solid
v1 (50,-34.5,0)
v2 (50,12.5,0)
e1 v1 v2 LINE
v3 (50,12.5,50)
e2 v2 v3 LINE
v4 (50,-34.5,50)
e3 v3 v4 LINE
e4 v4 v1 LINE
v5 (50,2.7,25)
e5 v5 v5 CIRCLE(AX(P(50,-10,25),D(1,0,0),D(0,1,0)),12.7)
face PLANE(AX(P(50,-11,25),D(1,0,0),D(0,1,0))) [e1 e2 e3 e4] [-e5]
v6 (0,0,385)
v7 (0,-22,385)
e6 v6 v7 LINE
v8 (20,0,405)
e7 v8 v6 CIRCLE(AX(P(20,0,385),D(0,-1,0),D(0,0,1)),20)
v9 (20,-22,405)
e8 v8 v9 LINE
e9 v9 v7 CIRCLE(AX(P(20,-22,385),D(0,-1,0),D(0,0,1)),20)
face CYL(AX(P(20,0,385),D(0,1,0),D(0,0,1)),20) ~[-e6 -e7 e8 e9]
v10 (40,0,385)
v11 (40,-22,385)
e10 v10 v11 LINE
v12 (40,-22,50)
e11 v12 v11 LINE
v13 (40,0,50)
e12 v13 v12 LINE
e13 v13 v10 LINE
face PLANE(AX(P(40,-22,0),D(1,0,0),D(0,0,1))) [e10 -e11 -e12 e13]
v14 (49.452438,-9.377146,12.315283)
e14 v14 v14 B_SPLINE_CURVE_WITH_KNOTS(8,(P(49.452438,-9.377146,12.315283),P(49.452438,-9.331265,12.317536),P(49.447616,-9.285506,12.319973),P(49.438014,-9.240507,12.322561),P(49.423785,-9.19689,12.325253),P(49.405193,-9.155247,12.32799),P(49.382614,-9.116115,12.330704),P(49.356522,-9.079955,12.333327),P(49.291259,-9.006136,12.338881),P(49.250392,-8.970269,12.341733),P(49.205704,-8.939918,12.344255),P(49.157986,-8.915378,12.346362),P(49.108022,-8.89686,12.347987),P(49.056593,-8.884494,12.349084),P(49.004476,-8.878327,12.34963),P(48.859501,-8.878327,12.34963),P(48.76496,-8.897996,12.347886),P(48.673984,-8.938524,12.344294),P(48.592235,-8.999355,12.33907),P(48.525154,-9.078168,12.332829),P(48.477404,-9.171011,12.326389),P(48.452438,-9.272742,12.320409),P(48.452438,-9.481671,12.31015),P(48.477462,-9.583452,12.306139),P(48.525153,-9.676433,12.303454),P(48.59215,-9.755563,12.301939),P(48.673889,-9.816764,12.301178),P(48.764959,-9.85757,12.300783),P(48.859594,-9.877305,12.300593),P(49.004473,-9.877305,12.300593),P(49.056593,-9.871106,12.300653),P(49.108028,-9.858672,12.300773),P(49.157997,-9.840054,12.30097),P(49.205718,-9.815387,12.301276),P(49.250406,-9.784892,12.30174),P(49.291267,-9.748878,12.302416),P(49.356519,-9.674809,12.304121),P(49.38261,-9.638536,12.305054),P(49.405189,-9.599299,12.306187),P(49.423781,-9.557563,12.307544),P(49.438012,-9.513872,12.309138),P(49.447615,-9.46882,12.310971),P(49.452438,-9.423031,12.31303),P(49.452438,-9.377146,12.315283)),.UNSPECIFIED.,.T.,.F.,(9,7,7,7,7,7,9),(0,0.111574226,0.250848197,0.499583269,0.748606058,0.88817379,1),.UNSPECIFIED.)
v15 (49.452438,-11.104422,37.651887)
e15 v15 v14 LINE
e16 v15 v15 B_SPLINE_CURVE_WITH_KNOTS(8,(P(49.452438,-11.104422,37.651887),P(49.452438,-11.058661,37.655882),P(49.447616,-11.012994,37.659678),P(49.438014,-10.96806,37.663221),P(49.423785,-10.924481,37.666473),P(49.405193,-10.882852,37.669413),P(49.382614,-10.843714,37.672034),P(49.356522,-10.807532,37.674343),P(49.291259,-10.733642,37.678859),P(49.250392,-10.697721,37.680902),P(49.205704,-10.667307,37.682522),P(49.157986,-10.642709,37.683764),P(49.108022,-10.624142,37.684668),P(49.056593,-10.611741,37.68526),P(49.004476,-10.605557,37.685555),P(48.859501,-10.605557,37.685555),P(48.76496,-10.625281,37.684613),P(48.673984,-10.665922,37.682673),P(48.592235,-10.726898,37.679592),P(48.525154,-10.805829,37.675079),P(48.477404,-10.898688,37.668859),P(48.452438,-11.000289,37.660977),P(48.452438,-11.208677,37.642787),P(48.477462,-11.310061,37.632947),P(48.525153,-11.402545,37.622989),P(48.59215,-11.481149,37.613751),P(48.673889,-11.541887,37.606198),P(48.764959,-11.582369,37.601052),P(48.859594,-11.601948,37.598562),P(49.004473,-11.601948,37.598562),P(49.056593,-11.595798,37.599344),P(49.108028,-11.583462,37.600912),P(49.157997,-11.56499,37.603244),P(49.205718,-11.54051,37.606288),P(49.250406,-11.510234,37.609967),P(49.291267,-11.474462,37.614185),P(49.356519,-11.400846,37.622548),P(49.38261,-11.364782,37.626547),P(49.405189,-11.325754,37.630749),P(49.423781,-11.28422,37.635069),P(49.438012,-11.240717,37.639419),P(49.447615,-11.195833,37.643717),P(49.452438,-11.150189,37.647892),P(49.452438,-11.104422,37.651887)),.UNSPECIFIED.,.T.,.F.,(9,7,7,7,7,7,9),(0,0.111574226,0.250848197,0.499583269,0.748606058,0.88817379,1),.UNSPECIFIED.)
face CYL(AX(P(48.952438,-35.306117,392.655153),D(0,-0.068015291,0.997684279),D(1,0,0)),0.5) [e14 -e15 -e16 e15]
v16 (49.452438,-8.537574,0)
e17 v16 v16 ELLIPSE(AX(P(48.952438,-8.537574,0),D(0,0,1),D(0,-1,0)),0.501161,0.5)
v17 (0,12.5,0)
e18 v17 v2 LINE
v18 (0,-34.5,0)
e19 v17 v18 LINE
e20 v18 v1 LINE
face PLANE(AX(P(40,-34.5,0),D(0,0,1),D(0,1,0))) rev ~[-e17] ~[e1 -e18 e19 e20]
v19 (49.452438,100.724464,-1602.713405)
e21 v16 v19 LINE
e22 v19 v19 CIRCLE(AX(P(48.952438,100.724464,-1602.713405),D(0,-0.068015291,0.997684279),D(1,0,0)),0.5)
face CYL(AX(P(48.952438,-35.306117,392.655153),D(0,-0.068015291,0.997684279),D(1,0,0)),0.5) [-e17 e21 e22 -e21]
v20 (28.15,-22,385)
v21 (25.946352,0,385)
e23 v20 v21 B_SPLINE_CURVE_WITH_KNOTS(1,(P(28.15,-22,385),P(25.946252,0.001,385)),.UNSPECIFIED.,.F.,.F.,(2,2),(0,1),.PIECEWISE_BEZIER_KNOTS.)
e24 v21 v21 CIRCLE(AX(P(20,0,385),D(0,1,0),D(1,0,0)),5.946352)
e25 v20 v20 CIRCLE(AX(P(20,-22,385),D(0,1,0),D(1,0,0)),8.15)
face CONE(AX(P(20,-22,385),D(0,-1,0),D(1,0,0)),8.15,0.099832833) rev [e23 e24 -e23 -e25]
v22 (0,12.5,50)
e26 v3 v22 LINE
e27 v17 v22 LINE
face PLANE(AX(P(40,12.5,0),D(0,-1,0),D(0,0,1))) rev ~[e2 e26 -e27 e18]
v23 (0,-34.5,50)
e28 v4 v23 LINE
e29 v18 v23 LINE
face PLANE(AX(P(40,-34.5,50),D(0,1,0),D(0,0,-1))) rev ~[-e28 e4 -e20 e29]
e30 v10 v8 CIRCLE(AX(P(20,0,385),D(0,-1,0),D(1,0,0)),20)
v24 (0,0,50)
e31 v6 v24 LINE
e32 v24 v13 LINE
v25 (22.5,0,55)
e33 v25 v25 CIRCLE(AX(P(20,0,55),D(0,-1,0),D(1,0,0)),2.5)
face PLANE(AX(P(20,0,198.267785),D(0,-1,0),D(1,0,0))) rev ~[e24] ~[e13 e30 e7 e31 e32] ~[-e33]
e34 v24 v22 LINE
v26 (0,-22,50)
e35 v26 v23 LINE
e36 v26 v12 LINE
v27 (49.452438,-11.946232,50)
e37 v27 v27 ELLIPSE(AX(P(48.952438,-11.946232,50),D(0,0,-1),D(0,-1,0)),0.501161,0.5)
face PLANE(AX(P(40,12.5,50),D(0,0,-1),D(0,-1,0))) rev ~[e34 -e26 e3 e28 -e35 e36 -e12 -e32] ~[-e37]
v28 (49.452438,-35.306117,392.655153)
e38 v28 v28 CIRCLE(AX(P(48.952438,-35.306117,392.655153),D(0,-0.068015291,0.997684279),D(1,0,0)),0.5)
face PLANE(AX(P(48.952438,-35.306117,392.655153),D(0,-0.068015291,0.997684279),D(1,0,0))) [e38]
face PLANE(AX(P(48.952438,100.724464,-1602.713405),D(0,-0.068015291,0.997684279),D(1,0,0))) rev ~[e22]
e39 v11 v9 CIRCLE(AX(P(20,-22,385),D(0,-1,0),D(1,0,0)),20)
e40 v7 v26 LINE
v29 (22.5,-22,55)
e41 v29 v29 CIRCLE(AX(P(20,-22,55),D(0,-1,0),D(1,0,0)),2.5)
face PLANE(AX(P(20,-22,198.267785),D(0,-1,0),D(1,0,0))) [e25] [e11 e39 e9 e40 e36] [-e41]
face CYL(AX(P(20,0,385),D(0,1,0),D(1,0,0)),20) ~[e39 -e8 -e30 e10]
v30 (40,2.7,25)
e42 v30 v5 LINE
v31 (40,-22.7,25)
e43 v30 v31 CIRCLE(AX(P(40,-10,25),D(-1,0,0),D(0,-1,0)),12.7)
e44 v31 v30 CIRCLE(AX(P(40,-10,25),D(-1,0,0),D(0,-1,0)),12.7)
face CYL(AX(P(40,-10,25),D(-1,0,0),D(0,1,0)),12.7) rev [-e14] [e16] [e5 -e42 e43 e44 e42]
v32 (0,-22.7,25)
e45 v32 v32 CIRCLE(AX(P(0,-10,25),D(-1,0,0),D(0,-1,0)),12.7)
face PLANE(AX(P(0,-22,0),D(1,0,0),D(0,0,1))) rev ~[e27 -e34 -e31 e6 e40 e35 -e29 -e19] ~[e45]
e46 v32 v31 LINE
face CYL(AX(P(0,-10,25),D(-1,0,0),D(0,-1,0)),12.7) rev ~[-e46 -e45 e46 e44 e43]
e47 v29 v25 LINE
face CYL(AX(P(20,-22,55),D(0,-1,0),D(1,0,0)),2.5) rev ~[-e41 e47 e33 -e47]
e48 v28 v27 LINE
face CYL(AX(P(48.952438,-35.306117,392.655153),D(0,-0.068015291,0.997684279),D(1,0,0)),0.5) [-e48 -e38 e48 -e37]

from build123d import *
from build123d import SkipClean  # not in build123d's __all__

# Parameters (mm, degrees)
F1_DEPTH      = 22
F2_R          = 8.15
F3_DEPTH      = 22.001
F3_TAPER      = 5.72
F4_W          = 40
F4_H          = 50
F5_DEPTH      = 12.5
F5_DEPTH_BACK = 34.5
F6_R          = 12.7
F7_DEPTH      = 40.001
F8_R          = 12.7
F9_DEPTH      = 10
F10_R         = 2.5
F11_DEPTH     = 25
F14_R         = 0.5
F15_DEPTH     = 2000


# Not quite as in the source:
# - after a boolean that leaves OpenCascade's solid faulty, fix() repairs it


with BuildPart() as f1:
    # F0 (on Front) → F1 (new body)
    with BuildSketch(Plane.XZ):
        with BuildLine():
            Line((0, 385), (0, 0))
            Line((0, 0), (40, 0))
            Line((40, 0), (40, 385))
            ThreePointArc((40, 385), (34.1421356237, 399.1421356237), (20, 405))
            ThreePointArc((20, 405), (5.8578643763, 399.1421356237), (0, 385))
        make_face()
    extrude(amount=F1_DEPTH)

    # F2 (on face) → F3 (cut, through all)
    with BuildSketch(Plane.XZ.offset(22)):
        with Locations((20, 385)):
            Circle(F2_R)
    extrude(amount=-F3_DEPTH, taper=F3_TAPER, mode=Mode.SUBTRACT)

    # F4 (on face) → F5 (join, two sides)
    with BuildSketch(Plane.XZ.offset(22)) as f5_sk:
        with Locations((20, 25)):
            Rectangle(F4_W, F4_H)
    extrude(amount=F5_DEPTH)
    extrude(f5_sk.sketch, amount=-F5_DEPTH_BACK)

    # F6 (on face) → F7 (cut, through all)
    with BuildSketch(Plane(origin=(0, 0, 0), x_dir=(0, -1, 0), z_dir=(-1, 0, 0))):
        with Locations((10, 25)):
            Circle(F6_R)
    extrude(amount=-F7_DEPTH, mode=Mode.SUBTRACT)

    # F8 (on face) → F9 (join)
    with BuildSketch(Plane.YZ.offset(40)):
        Polygon((0, 50), (-22, 50), (-34.5, 50), (-34.5, 0), (12.5, 0), (12.5, 50), align=None)
        with Locations((-10, 25)):
            Circle(F8_R, mode=Mode.SUBTRACT)
    with SkipClean():  # cleaning this boolean's faces spoils the solid; the shape is the same uncleaned
        extrude(amount=F9_DEPTH)

    # F10 (on face) → F11 (cut)
    with BuildSketch(Plane.XZ.offset(22)):
        with Locations((20, 55)):
            Circle(F10_R)
    extrude(amount=-F11_DEPTH, mode=Mode.SUBTRACT)

    add(f1.part.fix(), mode=Mode.REPLACE)

    # F14 (on line) → F15 (join)
    with BuildSketch(Plane(origin=(0, -26.8080383352, 393.2344937713), x_dir=(1, 0, 0), z_dir=(0, -0.0680152907, 0.9976842788))):
        with Locations((48.9524379373, -8.5178036243)):
            Circle(F14_R)
    extrude(amount=-F15_DEPTH)


solid = f1.part
